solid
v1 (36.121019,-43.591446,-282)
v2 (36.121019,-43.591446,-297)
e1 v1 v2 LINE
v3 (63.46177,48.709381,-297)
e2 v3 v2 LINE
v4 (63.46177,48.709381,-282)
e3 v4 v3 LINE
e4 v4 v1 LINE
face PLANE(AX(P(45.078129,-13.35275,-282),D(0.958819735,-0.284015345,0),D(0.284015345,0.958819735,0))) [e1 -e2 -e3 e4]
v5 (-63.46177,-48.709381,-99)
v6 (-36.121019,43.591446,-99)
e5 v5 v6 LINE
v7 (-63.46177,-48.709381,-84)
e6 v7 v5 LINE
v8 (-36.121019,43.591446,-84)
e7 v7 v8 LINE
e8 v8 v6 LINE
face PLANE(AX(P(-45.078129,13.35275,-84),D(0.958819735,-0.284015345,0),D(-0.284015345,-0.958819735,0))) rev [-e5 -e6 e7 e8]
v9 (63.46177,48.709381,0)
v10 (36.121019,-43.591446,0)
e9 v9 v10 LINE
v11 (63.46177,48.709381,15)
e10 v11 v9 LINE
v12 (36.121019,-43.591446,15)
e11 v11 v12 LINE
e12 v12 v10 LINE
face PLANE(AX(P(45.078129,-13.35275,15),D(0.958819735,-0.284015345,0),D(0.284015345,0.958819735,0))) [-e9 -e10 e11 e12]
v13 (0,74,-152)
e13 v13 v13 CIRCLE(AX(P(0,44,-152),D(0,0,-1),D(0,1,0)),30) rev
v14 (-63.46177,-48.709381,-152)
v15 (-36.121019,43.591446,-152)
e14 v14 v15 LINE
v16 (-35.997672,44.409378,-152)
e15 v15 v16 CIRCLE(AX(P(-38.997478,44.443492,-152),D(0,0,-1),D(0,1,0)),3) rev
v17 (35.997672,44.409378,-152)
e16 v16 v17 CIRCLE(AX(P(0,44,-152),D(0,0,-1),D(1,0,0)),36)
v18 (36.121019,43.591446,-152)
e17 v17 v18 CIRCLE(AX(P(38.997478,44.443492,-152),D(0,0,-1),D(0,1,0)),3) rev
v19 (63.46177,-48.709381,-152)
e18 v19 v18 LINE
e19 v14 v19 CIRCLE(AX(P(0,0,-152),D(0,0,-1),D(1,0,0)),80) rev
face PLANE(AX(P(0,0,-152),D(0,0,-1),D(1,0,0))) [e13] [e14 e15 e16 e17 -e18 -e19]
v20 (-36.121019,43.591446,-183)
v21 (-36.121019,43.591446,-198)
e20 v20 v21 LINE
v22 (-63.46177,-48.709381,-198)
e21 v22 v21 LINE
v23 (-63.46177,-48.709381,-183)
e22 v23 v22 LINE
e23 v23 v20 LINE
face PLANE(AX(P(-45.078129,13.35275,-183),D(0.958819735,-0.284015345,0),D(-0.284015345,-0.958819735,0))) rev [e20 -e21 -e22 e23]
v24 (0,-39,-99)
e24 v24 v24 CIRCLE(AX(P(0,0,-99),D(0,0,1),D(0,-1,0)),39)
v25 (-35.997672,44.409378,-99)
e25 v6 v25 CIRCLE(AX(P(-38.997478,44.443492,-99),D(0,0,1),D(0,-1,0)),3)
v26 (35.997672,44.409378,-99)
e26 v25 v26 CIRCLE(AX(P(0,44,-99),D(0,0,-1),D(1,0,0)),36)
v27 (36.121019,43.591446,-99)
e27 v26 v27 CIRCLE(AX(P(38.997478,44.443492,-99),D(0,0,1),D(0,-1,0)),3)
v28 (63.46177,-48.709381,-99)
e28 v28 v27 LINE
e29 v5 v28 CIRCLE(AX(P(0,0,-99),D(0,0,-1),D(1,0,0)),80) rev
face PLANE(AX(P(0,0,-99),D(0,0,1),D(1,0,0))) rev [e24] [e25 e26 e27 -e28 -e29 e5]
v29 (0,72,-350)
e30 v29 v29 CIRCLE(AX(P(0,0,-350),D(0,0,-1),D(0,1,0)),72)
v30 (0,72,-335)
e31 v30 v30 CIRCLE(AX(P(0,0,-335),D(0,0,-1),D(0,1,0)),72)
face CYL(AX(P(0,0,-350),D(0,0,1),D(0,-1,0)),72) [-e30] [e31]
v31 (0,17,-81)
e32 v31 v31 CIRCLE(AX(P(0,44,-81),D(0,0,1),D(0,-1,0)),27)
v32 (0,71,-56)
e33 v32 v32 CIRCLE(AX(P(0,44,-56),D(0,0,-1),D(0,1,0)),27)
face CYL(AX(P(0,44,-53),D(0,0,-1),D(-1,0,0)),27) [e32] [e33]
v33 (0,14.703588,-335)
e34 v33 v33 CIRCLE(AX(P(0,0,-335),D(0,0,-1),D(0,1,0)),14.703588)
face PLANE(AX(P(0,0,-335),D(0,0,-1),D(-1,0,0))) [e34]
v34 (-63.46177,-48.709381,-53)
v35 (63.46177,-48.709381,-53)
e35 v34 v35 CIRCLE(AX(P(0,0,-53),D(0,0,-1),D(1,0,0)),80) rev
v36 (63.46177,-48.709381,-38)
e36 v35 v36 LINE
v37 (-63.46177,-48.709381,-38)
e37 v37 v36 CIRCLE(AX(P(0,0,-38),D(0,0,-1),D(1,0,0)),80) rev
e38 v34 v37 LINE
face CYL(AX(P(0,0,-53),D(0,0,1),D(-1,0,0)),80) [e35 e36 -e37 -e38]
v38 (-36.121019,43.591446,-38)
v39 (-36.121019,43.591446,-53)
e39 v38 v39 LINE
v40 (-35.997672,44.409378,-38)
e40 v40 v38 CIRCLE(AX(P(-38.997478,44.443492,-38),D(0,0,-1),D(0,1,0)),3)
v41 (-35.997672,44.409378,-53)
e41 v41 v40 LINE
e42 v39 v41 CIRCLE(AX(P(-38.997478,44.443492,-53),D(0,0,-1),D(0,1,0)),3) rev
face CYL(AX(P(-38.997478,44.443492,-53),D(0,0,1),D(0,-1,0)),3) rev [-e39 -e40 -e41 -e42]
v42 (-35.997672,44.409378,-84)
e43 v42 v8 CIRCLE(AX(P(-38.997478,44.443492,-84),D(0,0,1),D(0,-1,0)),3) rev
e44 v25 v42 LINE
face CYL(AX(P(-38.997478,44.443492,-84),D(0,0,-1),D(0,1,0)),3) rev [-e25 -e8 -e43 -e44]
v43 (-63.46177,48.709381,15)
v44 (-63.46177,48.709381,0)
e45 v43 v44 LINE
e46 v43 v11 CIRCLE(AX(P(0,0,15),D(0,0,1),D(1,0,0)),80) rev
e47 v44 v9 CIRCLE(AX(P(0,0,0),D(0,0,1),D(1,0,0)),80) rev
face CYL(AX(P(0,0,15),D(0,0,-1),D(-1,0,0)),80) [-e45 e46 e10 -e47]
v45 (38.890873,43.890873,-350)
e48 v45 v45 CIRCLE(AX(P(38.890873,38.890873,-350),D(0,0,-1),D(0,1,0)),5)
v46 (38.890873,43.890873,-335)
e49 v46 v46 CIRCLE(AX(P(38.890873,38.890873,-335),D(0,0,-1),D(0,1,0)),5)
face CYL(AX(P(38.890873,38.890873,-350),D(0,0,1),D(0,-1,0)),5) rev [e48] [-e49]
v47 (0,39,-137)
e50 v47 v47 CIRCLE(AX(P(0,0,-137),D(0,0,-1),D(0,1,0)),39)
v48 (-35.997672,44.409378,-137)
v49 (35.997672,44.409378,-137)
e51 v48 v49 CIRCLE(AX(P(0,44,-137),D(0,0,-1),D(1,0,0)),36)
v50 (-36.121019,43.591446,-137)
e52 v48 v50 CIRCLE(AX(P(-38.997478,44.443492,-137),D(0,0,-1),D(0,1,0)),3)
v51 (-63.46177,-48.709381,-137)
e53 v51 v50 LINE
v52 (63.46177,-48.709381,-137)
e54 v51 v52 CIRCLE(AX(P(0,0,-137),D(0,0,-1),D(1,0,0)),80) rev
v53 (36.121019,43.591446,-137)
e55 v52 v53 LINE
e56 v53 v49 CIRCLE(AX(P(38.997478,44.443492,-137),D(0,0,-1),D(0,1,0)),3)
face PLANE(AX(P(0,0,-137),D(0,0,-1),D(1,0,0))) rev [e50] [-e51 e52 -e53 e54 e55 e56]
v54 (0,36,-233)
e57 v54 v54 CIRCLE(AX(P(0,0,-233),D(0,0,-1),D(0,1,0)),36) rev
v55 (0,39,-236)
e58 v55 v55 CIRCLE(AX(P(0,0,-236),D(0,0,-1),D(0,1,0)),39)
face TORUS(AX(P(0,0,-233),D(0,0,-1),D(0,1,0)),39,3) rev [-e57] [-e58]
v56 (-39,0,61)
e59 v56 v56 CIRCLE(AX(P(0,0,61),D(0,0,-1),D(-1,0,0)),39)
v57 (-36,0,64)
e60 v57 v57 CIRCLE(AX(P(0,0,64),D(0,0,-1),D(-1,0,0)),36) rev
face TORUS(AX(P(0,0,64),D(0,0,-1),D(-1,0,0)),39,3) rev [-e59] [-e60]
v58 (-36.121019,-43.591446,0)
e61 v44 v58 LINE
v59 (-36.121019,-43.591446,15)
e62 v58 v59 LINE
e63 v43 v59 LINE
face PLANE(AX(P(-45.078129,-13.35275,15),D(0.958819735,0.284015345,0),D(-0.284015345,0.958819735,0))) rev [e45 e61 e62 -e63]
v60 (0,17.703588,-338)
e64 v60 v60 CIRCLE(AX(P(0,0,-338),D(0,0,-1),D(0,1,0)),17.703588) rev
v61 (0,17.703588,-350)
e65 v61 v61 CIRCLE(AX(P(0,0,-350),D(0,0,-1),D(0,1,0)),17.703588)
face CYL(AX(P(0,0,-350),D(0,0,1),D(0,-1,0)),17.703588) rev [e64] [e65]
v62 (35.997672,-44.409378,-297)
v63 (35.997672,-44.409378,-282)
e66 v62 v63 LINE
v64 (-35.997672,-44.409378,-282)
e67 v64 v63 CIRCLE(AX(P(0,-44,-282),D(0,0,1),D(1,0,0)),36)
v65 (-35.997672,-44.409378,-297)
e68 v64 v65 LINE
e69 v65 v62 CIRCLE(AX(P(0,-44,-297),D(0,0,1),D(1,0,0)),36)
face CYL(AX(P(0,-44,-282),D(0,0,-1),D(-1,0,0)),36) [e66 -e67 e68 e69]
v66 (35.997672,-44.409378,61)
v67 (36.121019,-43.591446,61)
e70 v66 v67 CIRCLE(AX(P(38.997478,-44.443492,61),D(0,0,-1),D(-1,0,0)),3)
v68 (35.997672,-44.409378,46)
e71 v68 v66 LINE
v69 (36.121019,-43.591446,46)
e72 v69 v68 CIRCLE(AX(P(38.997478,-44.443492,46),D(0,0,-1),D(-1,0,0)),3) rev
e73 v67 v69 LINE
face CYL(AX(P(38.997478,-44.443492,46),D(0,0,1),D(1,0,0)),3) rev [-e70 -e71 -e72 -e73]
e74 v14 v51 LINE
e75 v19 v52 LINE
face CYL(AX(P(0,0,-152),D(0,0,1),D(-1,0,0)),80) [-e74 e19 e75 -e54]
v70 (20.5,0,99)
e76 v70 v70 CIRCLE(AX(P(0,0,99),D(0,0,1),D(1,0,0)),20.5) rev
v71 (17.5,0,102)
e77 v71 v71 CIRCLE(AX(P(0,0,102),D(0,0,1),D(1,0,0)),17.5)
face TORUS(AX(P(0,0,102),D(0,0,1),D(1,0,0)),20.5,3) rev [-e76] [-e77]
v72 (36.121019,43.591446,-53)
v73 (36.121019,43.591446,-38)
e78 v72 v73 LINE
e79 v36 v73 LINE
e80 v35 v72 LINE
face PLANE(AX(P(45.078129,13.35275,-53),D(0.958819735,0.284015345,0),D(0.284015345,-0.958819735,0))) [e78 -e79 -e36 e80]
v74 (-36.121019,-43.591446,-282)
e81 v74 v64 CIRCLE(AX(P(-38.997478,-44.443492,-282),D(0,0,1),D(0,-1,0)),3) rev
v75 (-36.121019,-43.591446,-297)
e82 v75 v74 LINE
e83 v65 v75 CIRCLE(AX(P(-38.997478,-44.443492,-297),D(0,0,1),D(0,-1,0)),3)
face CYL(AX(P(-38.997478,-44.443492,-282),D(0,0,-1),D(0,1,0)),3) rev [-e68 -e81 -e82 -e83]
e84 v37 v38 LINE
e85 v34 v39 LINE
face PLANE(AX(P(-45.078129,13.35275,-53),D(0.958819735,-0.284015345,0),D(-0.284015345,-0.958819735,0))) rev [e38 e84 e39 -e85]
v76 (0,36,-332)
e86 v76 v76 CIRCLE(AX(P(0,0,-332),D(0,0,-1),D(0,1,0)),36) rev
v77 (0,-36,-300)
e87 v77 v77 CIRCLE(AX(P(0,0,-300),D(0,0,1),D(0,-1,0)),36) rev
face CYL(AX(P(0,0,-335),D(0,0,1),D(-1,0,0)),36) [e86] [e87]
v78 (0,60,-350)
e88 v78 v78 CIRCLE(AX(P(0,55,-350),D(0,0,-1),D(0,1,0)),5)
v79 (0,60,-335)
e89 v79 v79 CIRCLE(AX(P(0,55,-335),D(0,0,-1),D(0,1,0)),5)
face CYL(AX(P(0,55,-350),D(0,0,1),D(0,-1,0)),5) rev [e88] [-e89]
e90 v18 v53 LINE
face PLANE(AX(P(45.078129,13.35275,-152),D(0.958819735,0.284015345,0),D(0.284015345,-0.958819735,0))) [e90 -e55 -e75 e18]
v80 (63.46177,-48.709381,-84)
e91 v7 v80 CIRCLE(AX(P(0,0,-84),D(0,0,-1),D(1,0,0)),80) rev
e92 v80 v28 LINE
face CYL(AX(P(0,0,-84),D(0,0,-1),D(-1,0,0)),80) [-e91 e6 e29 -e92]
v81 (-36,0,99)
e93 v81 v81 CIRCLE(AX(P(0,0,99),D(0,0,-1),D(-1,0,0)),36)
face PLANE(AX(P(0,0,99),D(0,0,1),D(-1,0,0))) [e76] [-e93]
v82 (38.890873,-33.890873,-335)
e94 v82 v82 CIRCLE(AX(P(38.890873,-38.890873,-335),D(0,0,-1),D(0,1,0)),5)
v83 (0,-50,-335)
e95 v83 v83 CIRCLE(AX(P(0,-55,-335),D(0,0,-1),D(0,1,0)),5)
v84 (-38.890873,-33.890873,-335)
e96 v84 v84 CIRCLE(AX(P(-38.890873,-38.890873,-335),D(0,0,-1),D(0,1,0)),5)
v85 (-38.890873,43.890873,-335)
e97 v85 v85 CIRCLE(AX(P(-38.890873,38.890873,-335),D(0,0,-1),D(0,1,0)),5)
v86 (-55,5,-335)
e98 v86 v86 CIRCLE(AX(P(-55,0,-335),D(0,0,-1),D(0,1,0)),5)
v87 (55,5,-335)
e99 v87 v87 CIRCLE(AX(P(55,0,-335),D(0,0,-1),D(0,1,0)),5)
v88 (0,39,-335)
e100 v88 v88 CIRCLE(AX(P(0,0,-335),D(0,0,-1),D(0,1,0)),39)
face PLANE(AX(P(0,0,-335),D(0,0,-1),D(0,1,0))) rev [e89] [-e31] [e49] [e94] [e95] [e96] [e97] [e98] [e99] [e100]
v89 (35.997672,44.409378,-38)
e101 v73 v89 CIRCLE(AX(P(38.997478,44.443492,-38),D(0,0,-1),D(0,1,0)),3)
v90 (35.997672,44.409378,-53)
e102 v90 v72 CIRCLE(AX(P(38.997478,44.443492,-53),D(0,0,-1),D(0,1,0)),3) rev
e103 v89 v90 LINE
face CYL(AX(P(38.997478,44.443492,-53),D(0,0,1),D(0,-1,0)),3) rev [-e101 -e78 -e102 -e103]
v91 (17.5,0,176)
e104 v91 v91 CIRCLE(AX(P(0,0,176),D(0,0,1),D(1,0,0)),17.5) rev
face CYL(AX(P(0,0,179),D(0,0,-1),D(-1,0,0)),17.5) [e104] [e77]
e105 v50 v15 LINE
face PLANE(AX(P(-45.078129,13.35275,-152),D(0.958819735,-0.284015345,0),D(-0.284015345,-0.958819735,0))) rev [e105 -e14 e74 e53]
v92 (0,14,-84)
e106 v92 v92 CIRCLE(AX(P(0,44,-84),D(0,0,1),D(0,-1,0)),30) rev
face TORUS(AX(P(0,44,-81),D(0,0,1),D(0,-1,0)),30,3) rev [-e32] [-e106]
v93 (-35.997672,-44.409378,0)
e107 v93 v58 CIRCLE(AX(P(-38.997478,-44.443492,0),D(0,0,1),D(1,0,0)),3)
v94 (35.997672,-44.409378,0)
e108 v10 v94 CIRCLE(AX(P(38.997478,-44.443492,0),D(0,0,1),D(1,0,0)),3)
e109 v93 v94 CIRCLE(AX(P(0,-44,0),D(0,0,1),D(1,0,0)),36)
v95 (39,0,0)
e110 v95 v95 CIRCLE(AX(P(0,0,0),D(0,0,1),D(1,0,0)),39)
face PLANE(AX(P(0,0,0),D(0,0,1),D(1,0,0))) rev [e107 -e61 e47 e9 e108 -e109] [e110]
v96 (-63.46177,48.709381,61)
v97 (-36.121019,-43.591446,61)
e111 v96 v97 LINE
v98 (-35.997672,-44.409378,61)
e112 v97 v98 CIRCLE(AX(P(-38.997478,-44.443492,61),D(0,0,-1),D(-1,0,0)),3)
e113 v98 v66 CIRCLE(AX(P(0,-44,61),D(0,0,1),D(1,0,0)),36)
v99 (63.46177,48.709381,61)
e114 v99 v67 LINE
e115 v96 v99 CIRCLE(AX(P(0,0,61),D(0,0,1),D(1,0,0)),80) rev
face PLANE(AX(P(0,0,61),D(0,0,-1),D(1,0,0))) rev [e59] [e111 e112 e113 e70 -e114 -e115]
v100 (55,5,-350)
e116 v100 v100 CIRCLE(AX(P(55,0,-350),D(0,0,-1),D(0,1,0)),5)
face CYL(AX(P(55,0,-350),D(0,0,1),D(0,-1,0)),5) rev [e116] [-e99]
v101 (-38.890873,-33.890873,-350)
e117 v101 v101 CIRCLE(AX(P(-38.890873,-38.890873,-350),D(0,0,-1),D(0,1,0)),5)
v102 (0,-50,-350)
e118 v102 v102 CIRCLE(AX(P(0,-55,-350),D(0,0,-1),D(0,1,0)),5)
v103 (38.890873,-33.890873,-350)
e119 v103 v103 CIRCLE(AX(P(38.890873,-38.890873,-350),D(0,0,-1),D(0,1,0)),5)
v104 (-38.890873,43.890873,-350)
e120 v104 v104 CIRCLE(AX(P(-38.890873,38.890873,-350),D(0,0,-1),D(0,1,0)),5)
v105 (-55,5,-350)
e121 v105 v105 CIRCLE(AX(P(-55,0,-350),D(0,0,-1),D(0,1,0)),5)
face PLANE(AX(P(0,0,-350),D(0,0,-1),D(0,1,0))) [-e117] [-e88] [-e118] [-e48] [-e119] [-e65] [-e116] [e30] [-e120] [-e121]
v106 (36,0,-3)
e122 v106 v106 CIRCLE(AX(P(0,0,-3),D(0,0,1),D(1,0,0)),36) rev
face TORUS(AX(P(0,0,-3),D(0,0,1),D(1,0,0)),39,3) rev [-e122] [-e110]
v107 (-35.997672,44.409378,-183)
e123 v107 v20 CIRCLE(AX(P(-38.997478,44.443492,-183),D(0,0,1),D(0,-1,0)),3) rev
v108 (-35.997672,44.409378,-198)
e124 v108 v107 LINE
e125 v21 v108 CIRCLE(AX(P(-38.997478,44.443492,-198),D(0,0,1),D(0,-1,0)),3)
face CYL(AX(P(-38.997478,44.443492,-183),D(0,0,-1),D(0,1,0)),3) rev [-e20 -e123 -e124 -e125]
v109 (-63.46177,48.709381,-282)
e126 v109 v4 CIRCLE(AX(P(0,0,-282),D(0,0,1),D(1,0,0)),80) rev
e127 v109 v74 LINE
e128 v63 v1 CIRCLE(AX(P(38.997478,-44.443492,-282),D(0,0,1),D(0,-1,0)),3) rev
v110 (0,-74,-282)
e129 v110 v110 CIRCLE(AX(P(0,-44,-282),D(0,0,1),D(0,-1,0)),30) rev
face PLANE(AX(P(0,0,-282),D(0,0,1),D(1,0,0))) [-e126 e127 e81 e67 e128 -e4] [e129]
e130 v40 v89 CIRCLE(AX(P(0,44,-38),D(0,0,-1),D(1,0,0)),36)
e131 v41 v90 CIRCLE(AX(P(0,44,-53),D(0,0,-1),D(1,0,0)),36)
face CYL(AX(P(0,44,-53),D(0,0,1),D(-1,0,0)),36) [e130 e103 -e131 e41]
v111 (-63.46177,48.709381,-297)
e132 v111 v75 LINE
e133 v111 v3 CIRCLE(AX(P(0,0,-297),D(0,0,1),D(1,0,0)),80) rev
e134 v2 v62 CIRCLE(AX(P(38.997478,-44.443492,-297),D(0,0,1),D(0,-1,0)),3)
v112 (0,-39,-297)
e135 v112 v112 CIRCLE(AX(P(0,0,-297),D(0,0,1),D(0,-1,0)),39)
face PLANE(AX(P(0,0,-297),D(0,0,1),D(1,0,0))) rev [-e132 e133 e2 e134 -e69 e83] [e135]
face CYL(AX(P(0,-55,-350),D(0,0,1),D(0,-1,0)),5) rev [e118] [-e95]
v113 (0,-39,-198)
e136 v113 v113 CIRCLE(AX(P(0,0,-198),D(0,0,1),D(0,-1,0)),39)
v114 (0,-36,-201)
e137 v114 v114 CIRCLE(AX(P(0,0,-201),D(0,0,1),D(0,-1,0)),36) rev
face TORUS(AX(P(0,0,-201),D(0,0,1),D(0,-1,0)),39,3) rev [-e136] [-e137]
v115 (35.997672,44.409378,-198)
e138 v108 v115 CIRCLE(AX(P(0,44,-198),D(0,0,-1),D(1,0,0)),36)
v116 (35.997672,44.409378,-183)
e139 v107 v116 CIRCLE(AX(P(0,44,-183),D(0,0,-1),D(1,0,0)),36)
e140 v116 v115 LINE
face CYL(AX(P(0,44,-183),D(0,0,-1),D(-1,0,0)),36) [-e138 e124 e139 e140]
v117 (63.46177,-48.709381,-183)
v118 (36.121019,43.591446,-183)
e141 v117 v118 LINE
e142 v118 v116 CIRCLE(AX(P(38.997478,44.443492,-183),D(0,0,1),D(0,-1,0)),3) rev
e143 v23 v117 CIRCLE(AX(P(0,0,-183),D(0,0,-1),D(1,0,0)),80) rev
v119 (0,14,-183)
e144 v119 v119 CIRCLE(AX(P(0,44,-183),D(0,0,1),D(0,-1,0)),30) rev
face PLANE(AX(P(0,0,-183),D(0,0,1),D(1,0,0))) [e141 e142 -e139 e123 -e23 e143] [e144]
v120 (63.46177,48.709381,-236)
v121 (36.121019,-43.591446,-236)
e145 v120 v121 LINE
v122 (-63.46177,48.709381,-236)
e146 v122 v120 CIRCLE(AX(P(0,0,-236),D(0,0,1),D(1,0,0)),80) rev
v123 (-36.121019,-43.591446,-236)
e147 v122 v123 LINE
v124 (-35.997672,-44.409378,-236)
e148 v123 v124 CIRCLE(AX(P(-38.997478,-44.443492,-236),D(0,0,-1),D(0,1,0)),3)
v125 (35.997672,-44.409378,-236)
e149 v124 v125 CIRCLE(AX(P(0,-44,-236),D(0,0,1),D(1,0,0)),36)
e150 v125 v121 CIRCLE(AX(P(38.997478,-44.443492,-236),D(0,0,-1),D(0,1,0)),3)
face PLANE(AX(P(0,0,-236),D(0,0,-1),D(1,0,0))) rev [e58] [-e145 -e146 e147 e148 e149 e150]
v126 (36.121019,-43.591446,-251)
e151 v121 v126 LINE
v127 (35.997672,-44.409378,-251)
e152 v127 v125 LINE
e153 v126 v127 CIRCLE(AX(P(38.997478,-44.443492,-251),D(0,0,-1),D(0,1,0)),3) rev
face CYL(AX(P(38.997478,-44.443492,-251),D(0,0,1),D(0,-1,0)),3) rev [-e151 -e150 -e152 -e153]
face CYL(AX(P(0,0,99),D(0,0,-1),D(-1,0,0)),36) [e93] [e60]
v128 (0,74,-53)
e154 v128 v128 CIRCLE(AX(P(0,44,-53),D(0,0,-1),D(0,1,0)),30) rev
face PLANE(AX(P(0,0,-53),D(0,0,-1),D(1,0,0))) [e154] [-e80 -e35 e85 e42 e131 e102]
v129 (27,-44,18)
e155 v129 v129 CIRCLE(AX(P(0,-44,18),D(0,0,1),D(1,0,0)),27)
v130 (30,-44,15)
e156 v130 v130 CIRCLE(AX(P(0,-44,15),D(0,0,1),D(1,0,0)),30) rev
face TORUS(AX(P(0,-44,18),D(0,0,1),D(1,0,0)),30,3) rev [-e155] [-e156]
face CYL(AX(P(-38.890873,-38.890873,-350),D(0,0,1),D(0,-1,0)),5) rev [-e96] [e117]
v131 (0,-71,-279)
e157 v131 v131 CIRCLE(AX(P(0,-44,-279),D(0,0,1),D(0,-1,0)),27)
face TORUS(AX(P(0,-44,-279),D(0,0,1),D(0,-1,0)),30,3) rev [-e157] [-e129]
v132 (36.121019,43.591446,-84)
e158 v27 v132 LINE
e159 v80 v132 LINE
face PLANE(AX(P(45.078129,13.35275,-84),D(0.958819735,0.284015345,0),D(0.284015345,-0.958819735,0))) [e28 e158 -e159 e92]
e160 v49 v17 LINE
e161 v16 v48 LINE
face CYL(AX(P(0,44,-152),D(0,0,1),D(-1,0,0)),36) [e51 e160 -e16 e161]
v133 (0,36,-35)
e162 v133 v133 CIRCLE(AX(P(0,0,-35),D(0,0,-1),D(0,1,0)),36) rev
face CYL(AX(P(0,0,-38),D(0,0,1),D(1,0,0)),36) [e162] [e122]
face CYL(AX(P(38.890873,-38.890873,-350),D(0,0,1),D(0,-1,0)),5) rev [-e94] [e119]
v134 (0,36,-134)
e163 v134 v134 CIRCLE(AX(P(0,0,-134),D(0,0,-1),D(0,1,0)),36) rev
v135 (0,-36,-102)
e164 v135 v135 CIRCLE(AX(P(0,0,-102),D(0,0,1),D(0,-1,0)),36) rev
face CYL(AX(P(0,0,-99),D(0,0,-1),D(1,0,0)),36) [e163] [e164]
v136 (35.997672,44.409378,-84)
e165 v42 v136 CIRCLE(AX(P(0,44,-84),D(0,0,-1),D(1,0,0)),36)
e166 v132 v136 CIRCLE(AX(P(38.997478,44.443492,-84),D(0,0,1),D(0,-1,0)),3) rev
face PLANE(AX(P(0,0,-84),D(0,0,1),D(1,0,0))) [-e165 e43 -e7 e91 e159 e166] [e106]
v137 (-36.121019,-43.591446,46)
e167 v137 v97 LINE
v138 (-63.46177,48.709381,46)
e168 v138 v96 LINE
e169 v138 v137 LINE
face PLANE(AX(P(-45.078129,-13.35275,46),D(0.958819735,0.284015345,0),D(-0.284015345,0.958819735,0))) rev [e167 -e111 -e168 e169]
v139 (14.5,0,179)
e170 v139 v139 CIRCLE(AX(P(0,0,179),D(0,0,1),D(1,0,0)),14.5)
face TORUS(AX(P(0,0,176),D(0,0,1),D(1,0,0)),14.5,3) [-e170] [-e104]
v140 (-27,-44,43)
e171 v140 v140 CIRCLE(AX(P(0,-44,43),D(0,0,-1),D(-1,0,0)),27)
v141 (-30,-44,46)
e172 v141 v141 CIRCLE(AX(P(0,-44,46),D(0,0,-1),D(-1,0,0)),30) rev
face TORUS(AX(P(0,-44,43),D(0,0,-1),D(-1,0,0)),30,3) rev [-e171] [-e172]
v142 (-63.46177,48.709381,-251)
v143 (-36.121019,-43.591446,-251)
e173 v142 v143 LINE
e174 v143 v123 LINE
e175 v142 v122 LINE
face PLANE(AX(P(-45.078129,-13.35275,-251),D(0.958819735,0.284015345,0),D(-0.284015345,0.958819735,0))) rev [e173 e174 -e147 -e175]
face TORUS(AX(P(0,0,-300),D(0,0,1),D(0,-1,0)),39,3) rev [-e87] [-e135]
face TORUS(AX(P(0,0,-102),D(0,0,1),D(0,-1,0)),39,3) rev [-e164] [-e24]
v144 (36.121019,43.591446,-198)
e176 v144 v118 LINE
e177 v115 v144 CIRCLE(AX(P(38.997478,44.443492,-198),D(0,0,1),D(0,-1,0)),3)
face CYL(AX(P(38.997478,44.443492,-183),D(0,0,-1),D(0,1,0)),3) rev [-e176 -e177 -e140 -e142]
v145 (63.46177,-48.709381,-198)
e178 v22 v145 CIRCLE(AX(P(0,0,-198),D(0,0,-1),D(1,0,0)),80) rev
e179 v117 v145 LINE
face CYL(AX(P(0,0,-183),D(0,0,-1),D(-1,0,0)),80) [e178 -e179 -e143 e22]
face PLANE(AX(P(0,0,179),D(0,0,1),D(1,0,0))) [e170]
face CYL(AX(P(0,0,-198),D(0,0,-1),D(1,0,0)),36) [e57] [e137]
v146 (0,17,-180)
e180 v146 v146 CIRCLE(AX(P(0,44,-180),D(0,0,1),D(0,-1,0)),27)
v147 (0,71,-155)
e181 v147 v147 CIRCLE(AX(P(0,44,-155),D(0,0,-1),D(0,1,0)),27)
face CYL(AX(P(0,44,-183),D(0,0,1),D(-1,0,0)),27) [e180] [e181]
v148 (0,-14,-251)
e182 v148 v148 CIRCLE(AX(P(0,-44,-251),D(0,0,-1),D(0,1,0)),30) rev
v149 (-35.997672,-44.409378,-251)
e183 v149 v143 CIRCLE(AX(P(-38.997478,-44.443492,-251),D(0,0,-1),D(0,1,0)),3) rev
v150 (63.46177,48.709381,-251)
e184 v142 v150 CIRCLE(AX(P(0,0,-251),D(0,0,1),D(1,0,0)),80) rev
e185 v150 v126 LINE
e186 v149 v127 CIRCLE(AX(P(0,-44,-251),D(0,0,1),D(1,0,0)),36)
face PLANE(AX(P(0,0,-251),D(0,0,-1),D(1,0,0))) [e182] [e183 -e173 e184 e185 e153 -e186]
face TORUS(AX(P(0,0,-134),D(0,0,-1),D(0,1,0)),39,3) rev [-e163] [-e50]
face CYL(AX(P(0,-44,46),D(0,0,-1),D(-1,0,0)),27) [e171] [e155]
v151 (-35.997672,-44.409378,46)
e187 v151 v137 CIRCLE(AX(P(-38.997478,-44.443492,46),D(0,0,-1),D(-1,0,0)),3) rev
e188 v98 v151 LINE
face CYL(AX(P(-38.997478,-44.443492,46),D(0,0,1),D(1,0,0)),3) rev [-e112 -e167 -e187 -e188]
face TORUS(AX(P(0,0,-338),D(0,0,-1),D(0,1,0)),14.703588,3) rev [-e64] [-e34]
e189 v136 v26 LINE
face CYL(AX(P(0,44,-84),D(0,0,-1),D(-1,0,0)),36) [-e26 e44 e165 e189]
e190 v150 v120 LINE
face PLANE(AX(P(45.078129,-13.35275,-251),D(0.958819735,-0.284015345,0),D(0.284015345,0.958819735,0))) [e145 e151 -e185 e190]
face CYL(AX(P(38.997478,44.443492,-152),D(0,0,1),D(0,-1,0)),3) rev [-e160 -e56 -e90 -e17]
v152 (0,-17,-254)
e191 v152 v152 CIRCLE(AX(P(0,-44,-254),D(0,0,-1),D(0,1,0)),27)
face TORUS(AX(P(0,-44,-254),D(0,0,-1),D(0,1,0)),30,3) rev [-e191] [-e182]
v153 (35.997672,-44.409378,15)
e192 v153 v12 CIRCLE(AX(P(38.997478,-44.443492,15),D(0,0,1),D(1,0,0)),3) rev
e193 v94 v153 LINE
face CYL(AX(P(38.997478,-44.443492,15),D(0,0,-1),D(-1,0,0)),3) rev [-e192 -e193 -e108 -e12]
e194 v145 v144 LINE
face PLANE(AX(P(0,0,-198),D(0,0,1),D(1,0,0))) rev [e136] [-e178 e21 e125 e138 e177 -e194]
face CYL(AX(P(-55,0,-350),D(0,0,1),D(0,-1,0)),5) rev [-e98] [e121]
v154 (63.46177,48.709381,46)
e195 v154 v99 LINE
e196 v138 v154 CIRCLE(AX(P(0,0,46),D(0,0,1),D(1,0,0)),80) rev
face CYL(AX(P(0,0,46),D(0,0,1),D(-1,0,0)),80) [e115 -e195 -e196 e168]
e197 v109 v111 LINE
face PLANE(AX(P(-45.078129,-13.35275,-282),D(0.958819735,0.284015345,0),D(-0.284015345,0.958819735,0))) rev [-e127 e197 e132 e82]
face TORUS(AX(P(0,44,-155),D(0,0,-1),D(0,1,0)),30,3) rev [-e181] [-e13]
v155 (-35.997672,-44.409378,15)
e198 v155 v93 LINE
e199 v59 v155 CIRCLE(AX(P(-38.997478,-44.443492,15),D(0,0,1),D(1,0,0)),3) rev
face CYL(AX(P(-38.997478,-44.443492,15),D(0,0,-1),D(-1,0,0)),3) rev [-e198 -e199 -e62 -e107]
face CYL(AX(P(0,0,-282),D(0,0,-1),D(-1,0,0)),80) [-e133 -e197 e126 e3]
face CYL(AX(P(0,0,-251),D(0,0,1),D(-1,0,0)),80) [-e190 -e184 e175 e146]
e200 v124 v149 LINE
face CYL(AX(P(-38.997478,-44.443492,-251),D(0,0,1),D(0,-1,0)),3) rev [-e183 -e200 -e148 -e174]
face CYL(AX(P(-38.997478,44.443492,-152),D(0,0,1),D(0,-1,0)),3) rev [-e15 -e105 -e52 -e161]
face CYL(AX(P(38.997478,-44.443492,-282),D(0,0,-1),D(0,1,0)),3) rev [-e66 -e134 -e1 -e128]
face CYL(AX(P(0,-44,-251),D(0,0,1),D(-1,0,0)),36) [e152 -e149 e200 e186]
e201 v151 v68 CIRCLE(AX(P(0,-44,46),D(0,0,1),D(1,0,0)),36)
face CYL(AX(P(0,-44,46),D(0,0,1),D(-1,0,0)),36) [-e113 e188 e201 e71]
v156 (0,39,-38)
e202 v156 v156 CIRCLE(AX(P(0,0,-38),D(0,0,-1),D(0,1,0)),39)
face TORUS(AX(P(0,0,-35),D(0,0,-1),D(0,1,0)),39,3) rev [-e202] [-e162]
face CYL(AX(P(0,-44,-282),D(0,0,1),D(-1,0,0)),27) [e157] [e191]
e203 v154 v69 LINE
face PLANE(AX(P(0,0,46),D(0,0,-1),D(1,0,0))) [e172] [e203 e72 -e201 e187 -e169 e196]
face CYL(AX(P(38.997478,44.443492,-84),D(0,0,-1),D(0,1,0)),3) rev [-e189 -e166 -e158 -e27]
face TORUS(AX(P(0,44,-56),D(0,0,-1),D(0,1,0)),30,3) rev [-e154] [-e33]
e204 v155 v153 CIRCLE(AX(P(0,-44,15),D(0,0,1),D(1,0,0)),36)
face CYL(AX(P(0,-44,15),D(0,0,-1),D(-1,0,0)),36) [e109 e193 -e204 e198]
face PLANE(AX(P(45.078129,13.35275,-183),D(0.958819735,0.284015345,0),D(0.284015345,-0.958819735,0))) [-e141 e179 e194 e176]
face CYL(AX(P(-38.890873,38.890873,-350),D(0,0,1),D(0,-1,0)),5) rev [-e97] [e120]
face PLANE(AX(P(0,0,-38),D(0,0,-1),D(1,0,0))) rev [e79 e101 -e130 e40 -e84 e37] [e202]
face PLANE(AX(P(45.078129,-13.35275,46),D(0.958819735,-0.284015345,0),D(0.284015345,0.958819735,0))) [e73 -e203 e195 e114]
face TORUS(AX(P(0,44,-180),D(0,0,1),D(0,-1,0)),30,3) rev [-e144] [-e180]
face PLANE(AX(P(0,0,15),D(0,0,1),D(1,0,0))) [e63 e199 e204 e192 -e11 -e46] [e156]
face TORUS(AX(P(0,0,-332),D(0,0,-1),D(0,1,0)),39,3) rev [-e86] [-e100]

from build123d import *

# Parameters (mm, degrees)
SKETCH1_R             = 27
BOSS_EXTRUDE1_DEPTH   = 15
SKETCH1_3_R           = 27
BOSS_EXTRUDE2_DEPTH   = 46
SKETCH3_R             = 36
BOSS_EXTRUDE3_DEPTH   = 38
MIRROR2_START         = 46
MIRROR2_DEPTH         = 15
BODY_MOVE_COPY1_ANGLE = 180
SKETCH4_R             = 17.5
BOSS_EXTRUDE4_DEPTH   = 80
SKETCH5_R             = 72
SKETCH5_R_2           = 17.703587944
SKETCH5_R_3           = 5
BOSS_EXTRUDE5_DEPTH   = 15
FILLET1_R             = 3


# Read off the part's stored shape, not the designer's step: Mirror2
with BuildPart() as part:
    # Sketch1 → Boss-Extrude1 (new body)
    with BuildSketch(Plane.XY):
        with BuildLine():
            ThreePointArc((63.461769721, 48.709380861), (0, 80), (-63.461769721, 48.709380861))
            Line((-63.461769721, 48.709380861), (-36, -44))
            ThreePointArc((-36, -44), (0, -80), (36, -44))
            Line((36, -44), (63.461769721, 48.709380861))
        make_face()
        with Locations((0, -44)):
            Circle(SKETCH1_R, mode=Mode.SUBTRACT)
    extrude(amount=BOSS_EXTRUDE1_DEPTH)

    # Sketch1<3> → Boss-Extrude2 (add)
    with BuildSketch(Plane.XY):
        with Locations((0, -44)):
            Circle(SKETCH1_3_R)
    extrude(amount=BOSS_EXTRUDE2_DEPTH)

    # Sketch3 → Boss-Extrude3 (add)
    with BuildSketch(Plane(origin=(0, 0, 0), x_dir=(-1, 0, 0), z_dir=(0, 0, -1))):
        Circle(SKETCH3_R)
    boss_extrude3 = extrude(amount=BOSS_EXTRUDE3_DEPTH)

    # Mirror2 outline → Mirror2 (add)
    with BuildSketch(Plane.XY.offset(MIRROR2_START)):
        with BuildLine():
            Line((36, -44), (63.461769721, 48.709380861))
            ThreePointArc((63.461769721, 48.709380861), (0, 80), (-63.461769721, 48.709380861))
            Line((-63.461769721, 48.709380861), (-36, -44))
            ThreePointArc((-36, -44), (0, -80), (36, -44))
        make_face()
    extrude(amount=MIRROR2_DEPTH)

    # Mirror3: Boss-Extrude3 across plane
    add(boss_extrude3.mirror(Plane.XY.offset(30.5)))


with BuildPart() as body_2:
    # Mirror4: mirrored copy
    add(part.part.mirror(Plane(origin=(0, 0, -19), x_dir=(1, 0, 0), z_dir=(0, 0, -1))))


with BuildPart() as body_2_1:
    # Body-Move/Copy1: moved
    add(body_2.part.rotate(Axis((0, 0, -68.5), (1, 0, 0)), BODY_MOVE_COPY1_ANGLE))


with BuildPart() as body_3:
    # Mirror5: mirrored copy
    add(part.part.mirror(Plane(origin=(0, 0, -118), x_dir=(1, 0, 0), z_dir=(0, 0, -1))))

    # Sketch5 → Boss-Extrude5 (add)
    with BuildSketch(Plane(origin=(0, 0, -335), x_dir=(-1, 0, 0), z_dir=(0, 0, -1))):
        with Locations(Location((0, 0, 0), (0, 0, 90))):
            Circle(SKETCH5_R)
        with Locations(Location((0, 0, 0), (0, 0, 90))):
            Circle(SKETCH5_R_2, mode=Mode.SUBTRACT)
        with Locations(Location((0, 55, 0), (0, 0, 90))):
            Circle(SKETCH5_R_3, mode=Mode.SUBTRACT)
        with Locations(Location((38.890872965, 38.890872965, 0), (0, 0, 90))):
            Circle(SKETCH5_R_3, mode=Mode.SUBTRACT)
        with Locations(Location((55, 0, 0), (0, 0, 90))):
            Circle(SKETCH5_R_3, mode=Mode.SUBTRACT)
        with Locations(Location((38.890872965, -38.890872965, 0), (0, 0, 90))):
            Circle(SKETCH5_R_3, mode=Mode.SUBTRACT)
        with Locations(Location((0, -55, 0), (0, 0, 90))):
            Circle(SKETCH5_R_3, mode=Mode.SUBTRACT)
        with Locations(Location((-38.890872965, -38.890872965, 0), (0, 0, 90))):
            Circle(SKETCH5_R_3, mode=Mode.SUBTRACT)
        with Locations(Location((-55, 0, 0), (0, 0, 90))):
            Circle(SKETCH5_R_3, mode=Mode.SUBTRACT)
        with Locations(Location((-38.890872965, 38.890872965, 0), (0, 0, 90))):
            Circle(SKETCH5_R_3, mode=Mode.SUBTRACT)
    extrude(amount=BOSS_EXTRUDE5_DEPTH)


with BuildPart() as body_4:
    # Mirror5 2: mirrored copy
    add(body_2_1.part.mirror(Plane(origin=(0, 0, -118), x_dir=(1, 0, 0), z_dir=(0, 0, -1))))


with BuildPart() as part_1:
    add(part.part)

    # Sketch4 → Boss-Extrude4 (add)
    with BuildSketch(Plane.XY.offset(99)):
        Circle(SKETCH4_R)
    extrude(amount=BOSS_EXTRUDE4_DEPTH)


with BuildPart() as body_3_1:
    add(body_3.part)

    # Combine1: union body 4, part, body 2
    add(body_4.part)
    add(part_1.part)
    add(body_2_1.part)

    # Fillet1
    fillet1_edges = [body_3_1.edges().sort_by_distance(p)[0] for p in [
        (-27, -44, 15),
        (36, 0, 0),
        (36, 0, 61),
        (-36, -44, 53.5),
        (36, -44, 53.5),
        (-27, -44, 46),
        (-17.5, 0, 99),
        (-17.5, 0, 179),
        (-36, 44, -91.5),
        (36, 44, -91.5),
        (-27, 44, -84),
        (36, 0, -99),
        (-27, 44, -53),
        (36, 0, -38),
        (-36, 44, -45.5),
        (36, 44, -45.5),
        (36, -44, -243.5),
        (-36, -44, -243.5),
        (-27, -44, -282),
        (36, 0, -236),
        (-27, -44, -251),
        (-36, -44, -289.5),
        (36, -44, -289.5),
        (36, 0, -335),
        (36, 0, -297),
        (0, -17.703587944, -335),
        (-36, 44, -144.5),
        (36, 44, -144.5),
        (-27, 44, -152),
        (36, 0, -137),
        (36, 0, -198),
        (-36, 44, -190.5),
        (36, 44, -190.5),
        (-27, 44, -183),
        (-36, -44, 7.5),
        (36, -44, 7.5),
    ]]
    fillet(fillet1_edges, radius=FILLET1_R)


solid = body_3_1.part
